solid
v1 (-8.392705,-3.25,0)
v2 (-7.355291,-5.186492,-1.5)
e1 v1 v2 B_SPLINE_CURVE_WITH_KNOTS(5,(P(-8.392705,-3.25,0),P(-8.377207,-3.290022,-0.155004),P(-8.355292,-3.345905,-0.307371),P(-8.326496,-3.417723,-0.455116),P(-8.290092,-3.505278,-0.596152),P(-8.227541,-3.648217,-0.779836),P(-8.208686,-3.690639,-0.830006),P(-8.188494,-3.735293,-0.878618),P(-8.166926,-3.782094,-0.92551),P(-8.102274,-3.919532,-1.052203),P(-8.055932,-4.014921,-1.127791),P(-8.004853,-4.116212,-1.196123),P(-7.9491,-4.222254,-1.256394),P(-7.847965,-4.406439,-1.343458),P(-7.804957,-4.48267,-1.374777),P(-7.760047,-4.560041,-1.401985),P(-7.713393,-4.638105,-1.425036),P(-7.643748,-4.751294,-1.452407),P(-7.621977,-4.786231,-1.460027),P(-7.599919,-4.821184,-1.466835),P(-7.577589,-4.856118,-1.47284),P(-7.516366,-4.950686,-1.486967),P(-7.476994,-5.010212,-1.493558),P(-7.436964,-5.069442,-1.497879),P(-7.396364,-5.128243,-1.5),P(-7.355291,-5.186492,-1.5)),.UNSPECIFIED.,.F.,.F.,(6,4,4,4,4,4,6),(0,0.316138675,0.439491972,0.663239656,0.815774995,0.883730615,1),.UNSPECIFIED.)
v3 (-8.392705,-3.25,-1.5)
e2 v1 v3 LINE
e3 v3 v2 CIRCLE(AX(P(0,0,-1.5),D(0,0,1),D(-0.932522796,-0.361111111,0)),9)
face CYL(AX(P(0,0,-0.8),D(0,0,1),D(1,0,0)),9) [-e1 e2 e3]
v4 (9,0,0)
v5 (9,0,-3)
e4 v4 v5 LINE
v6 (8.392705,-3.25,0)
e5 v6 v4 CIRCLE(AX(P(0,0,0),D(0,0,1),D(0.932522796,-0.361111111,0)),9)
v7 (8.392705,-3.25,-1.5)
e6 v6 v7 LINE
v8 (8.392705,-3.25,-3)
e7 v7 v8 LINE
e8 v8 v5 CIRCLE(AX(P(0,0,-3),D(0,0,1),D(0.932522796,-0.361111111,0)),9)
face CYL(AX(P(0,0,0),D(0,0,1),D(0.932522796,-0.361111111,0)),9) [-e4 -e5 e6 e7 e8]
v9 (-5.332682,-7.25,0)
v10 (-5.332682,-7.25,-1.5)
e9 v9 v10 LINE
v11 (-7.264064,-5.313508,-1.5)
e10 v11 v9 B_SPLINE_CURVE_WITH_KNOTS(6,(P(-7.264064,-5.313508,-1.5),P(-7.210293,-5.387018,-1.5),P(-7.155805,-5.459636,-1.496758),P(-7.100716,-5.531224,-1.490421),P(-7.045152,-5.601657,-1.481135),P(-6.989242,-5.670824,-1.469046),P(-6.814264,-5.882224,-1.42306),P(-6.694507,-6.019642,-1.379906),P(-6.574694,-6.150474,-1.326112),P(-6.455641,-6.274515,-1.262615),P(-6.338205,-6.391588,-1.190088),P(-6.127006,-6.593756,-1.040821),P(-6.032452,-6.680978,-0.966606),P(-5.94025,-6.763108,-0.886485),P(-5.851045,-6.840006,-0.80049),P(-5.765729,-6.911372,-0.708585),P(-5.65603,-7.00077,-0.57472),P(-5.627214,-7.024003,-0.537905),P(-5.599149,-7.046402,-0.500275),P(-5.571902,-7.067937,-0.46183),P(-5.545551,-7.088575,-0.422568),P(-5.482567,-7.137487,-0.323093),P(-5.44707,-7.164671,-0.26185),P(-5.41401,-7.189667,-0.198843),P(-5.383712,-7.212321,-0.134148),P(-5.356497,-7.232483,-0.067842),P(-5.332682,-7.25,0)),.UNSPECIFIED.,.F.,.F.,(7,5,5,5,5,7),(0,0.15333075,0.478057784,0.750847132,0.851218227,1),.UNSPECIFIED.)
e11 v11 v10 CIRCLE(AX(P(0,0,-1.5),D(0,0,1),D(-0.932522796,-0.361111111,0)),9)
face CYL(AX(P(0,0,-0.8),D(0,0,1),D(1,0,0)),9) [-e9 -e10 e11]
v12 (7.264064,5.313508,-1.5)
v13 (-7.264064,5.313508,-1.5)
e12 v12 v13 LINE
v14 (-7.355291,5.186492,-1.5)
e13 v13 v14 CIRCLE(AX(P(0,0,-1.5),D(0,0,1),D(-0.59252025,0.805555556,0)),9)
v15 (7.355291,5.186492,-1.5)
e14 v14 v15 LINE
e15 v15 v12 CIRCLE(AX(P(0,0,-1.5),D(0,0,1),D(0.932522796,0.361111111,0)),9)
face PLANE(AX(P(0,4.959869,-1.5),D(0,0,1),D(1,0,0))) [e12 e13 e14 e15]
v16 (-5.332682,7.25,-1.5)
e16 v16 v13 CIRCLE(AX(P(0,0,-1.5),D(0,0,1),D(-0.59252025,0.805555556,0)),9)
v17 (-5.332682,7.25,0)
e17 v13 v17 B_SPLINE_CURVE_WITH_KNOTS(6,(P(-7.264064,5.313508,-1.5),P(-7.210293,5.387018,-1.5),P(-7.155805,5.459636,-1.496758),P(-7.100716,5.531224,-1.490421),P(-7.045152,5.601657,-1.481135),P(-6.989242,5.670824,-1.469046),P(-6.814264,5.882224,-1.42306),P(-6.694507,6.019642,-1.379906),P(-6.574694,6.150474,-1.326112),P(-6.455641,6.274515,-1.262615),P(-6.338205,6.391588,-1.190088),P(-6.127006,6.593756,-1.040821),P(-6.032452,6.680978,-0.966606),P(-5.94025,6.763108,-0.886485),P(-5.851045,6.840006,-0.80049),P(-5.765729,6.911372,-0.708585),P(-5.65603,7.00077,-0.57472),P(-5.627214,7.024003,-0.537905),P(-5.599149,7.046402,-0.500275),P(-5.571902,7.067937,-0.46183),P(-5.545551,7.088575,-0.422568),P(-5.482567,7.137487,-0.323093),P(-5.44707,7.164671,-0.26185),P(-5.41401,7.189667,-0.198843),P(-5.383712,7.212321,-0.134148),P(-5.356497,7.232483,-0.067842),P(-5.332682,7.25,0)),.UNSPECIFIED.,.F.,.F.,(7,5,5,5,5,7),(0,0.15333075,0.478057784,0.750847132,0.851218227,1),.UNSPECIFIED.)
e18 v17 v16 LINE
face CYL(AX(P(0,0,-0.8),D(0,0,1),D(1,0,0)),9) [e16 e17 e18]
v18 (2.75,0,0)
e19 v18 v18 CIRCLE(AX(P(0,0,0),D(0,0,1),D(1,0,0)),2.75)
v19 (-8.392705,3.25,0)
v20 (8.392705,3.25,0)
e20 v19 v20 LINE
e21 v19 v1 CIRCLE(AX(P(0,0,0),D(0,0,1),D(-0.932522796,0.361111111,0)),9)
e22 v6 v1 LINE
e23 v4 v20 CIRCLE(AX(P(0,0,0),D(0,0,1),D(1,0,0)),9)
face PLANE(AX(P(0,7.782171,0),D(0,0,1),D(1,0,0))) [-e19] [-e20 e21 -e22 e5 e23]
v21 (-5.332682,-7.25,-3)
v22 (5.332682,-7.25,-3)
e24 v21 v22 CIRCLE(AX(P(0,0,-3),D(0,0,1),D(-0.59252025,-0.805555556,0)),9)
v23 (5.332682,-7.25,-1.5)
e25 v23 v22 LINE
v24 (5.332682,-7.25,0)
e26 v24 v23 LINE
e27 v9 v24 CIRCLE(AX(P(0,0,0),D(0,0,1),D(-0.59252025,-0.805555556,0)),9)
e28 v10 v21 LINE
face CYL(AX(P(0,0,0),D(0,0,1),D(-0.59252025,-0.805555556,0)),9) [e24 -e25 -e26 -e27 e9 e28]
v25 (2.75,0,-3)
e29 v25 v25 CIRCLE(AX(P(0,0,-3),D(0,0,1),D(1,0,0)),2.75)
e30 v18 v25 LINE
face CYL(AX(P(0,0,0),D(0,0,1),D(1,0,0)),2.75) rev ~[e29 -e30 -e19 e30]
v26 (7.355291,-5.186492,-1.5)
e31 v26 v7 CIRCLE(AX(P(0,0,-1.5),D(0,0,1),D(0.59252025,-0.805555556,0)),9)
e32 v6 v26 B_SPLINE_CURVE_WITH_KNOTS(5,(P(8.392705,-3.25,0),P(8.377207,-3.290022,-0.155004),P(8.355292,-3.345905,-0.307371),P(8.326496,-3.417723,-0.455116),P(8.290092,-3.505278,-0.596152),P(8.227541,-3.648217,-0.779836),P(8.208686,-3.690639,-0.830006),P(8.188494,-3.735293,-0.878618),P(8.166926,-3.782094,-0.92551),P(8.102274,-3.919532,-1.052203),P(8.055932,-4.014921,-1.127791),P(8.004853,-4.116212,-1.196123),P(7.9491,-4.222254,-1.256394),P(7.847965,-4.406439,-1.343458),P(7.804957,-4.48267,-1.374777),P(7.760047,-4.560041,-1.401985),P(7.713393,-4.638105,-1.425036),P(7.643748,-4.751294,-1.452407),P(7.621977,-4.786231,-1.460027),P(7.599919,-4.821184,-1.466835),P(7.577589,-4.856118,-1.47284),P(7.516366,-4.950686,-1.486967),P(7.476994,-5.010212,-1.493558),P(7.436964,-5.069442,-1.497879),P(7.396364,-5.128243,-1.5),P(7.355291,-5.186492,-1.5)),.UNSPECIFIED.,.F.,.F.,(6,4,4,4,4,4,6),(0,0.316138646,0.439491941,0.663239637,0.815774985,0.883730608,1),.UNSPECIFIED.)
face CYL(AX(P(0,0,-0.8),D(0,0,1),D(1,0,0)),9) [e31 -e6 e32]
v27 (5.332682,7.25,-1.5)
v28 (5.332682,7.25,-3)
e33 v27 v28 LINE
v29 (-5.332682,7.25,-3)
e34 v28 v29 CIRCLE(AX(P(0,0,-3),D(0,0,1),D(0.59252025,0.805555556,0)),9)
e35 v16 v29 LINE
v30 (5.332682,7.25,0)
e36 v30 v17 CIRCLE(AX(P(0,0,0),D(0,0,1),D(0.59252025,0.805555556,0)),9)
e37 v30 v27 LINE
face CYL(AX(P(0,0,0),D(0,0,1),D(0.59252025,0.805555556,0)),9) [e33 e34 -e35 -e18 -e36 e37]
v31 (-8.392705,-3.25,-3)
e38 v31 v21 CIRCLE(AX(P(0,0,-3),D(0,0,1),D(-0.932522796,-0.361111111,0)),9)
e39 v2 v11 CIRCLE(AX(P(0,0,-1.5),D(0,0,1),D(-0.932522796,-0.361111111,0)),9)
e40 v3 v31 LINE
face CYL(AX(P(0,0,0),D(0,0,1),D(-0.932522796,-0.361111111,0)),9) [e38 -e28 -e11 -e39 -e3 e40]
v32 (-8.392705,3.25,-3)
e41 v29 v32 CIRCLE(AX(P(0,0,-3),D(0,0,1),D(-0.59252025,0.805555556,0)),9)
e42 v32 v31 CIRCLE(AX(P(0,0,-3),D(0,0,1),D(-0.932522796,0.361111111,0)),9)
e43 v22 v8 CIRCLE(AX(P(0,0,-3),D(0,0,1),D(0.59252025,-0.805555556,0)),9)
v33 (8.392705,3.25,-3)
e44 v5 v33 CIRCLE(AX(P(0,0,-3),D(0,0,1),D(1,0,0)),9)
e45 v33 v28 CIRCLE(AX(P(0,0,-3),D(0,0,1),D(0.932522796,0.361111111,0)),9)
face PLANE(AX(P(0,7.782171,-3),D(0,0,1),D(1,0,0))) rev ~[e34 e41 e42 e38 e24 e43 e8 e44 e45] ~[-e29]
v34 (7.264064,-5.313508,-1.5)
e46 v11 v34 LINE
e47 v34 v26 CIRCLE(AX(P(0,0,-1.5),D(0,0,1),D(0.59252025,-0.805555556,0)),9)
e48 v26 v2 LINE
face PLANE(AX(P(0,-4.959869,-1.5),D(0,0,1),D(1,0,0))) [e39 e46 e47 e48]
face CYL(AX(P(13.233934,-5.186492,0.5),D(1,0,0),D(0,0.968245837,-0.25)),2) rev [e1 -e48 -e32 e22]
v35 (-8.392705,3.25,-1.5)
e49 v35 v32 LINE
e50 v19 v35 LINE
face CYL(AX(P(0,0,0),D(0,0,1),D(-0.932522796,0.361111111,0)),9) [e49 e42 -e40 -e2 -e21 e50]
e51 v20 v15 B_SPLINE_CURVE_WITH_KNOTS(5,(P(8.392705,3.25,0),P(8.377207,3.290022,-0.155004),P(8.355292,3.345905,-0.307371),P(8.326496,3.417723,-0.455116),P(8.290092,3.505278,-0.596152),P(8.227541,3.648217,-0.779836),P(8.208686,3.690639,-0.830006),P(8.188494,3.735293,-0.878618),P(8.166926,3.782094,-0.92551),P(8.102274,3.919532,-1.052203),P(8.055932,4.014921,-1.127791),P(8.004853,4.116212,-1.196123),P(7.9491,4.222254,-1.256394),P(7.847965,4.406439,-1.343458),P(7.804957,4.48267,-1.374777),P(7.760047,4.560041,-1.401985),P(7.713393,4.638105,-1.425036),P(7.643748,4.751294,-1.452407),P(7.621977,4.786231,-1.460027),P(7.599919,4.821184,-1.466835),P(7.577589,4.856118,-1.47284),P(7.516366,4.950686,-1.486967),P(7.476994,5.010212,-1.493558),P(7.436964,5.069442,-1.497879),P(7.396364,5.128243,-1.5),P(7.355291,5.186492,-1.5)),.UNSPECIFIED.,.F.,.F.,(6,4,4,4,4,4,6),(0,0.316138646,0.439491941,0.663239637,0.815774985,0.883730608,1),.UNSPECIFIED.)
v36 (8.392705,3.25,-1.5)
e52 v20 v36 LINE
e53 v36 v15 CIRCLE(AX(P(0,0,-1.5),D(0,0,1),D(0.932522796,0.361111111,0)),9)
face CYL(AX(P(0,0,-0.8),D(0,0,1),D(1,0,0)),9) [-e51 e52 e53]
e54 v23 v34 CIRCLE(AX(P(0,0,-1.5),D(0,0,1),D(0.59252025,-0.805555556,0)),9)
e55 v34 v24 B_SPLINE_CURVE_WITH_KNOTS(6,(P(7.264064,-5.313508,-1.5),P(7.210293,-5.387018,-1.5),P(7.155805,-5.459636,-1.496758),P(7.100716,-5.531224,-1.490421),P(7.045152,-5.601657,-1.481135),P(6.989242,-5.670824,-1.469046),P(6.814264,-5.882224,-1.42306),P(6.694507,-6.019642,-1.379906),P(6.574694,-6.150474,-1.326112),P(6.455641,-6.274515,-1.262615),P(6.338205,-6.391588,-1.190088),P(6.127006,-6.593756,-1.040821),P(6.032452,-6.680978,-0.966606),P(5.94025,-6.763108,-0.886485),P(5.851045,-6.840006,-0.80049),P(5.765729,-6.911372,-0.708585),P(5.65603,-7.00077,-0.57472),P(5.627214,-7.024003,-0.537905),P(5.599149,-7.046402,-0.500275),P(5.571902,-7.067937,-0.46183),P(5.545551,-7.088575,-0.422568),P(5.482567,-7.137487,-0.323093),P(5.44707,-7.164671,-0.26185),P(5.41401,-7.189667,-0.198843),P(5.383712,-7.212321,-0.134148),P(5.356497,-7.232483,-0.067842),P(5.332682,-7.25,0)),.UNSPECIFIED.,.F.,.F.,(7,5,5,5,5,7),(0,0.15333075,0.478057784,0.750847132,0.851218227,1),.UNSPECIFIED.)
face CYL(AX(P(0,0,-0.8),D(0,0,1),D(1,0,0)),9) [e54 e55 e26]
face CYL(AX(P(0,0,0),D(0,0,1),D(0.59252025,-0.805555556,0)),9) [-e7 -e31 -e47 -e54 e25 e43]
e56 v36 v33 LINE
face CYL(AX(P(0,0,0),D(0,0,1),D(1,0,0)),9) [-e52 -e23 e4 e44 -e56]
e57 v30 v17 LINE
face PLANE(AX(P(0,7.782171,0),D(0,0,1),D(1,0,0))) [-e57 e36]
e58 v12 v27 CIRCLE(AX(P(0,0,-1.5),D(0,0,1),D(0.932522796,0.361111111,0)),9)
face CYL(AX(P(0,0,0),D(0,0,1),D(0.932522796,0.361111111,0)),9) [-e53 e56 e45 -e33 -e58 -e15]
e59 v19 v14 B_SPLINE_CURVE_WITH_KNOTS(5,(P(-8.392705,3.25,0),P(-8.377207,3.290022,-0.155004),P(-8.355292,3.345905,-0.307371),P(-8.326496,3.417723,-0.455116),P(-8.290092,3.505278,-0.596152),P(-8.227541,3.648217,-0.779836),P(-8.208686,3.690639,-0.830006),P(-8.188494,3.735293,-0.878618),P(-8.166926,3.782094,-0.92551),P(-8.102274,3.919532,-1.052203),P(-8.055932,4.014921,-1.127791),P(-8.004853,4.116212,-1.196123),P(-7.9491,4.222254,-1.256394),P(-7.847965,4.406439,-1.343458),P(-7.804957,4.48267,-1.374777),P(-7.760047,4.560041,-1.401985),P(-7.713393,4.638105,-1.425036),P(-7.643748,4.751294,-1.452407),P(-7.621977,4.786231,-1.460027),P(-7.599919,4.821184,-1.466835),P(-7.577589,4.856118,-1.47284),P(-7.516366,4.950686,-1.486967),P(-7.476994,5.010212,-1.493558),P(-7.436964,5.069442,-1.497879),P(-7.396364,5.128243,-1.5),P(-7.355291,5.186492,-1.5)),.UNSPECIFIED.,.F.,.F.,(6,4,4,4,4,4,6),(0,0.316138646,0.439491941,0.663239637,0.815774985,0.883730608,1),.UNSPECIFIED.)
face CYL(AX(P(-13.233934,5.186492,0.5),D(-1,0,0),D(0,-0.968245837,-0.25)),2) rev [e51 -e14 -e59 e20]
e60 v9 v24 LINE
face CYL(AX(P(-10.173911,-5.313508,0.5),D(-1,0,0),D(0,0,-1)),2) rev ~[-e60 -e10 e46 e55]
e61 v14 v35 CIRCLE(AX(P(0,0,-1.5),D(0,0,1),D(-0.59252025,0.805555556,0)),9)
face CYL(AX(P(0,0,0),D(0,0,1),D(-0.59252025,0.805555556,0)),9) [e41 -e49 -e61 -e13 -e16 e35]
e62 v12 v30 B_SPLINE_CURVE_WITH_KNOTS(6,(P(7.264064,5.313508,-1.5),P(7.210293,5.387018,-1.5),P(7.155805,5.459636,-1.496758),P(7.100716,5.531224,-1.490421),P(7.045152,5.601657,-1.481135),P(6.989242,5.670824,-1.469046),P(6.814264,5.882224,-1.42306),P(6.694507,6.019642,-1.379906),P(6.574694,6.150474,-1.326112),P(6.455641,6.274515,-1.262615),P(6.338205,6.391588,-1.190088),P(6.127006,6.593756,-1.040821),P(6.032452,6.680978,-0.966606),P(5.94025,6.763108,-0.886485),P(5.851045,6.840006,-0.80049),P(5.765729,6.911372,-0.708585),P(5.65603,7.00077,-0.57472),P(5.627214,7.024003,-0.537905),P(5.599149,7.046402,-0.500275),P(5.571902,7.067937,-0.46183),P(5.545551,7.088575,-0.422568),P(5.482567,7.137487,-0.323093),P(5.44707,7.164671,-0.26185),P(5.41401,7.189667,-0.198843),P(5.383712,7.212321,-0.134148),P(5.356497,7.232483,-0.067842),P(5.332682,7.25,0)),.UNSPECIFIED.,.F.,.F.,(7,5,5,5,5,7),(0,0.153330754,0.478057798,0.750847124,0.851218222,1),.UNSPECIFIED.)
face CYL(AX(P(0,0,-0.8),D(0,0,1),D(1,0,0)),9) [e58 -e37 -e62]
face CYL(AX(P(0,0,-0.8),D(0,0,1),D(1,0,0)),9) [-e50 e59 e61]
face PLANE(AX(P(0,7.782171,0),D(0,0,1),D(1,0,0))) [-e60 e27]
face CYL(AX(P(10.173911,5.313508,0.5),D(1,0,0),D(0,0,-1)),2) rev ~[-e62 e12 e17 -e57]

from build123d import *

# Parameters (mm, degrees)
F0_R         = 2.75
F1_DEPTH     = 3
F2_DEPTH     = 1.5
F3_T4_DEPTH  = 26.4678686971
F3_S5_R      = 9
F3_T6_DEPTH  = 15
F3_T10_DEPTH = 20.3478228694
F3_S11_R     = 9
F3_T12_DEPTH = 12
F3_T16_DEPTH = 26.4678686971
F3_S17_R     = 9
F3_T18_DEPTH = 15
F3_T22_DEPTH = 20.3478228694
F3_S23_R     = 9
F3_T24_DEPTH = 12


# Not quite as in the source:
# - a fillet or chamfer that OpenCascade refuses, or shapes differently, is made with other operations: its cross-section is extruded or revolved along the edge and cut away or added


with BuildPart() as f1:
    # F0 (on Top) → F1 (new body)
    with BuildSketch(Plane.XY):
        with BuildLine():
            Line((-5.3326822519, 7.25), (5.3326822519, 7.25))
            ThreePointArc((5.3326822519, 7.25), (0, 9), (-5.3326822519, 7.25))
        make_face()
        with BuildLine():
            Line((-8.3927051658, 3.25), (8.3927051658, 3.25))
            ThreePointArc((8.3927051658, 3.25), (7.1481861295, 5.4684033372), (5.3326822519, 7.25))
            Line((5.3326822519, 7.25), (-5.3326822519, 7.25))
            ThreePointArc((-5.3326822519, 7.25), (-7.1481861295, 5.4684033372), (-8.3927051658, 3.25))
        make_face()
        with BuildLine():
            ThreePointArc((5.3326822519, -7.25), (7.1481861295, -5.4684033372), (8.3927051658, -3.25))
            Line((8.3927051658, -3.25), (-8.3927051658, -3.25))
            ThreePointArc((-8.3927051658, -3.25), (-7.1481861295, -5.4684033372), (-5.3326822519, -7.25))
            Line((-5.3326822519, -7.25), (5.3326822519, -7.25))
        make_face()
        with BuildLine():
            ThreePointArc((-5.3326822519, -7.25), (0, -9), (5.3326822519, -7.25))
            Line((5.3326822519, -7.25), (-5.3326822519, -7.25))
        make_face()
        with BuildLine():
            ThreePointArc((8.3927051658, -3.25), (8.8468736425, -1.6531263575), (9, 0))
            ThreePointArc((9, 0), (8.8468736425, 1.6531263575), (8.3927051658, 3.25))
            Line((8.3927051658, 3.25), (-8.3927051658, 3.25))
            ThreePointArc((-8.3927051658, 3.25), (-9, 0), (-8.3927051658, -3.25))
            Line((-8.3927051658, -3.25), (8.3927051658, -3.25))
        make_face()
        Circle(F0_R, mode=Mode.SUBTRACT)
    extrude(amount=-F1_DEPTH)

    # F0 (on Top) → F2 (cut)
    with BuildSketch(Plane.XY):
        with BuildLine():
            Line((-8.3927051658, 3.25), (8.3927051658, 3.25))
            ThreePointArc((8.3927051658, 3.25), (7.1481861295, 5.4684033372), (5.3326822519, 7.25))
            Line((5.3326822519, 7.25), (-5.3326822519, 7.25))
            ThreePointArc((-5.3326822519, 7.25), (-7.1481861295, 5.4684033372), (-8.3927051658, 3.25))
        make_face()
        with BuildLine():
            ThreePointArc((5.3326822519, -7.25), (7.1481861295, -5.4684033372), (8.3927051658, -3.25))
            Line((8.3927051658, -3.25), (-8.3927051658, -3.25))
            ThreePointArc((-8.3927051658, -3.25), (-7.1481861295, -5.4684033372), (-5.3326822519, -7.25))
            Line((-5.3326822519, -7.25), (5.3326822519, -7.25))
        make_face()
    extrude(amount=-F2_DEPTH, mode=Mode.SUBTRACT)

    # F3: fillet of radius 2 on 4 edges, made by hand


with BuildPart() as f3_tool2:
    # F3_s3 → F3_t4 (new body)
    with BuildSketch(Plane.YZ.offset(-13.2339343486)):
        with BuildLine():
            ThreePointArc((3.25, 0), (3.9617468017, -1.0811388301), (5.1864916731, -1.5))
            Line((5.1864916731, -1.5), (3.25, -1.5))
            Line((3.25, -1.5), (3.25, 0))
        make_face()
    extrude(amount=F3_T4_DEPTH)

    # F3_s5 → F3_t6 (intersect, symmetric)
    with BuildSketch(Plane.XY.offset(-0.8)):
        Circle(F3_S5_R)
    extrude(amount=F3_T6_DEPTH, both=True, mode=Mode.INTERSECT)


with BuildPart() as f1_1:
    add(f1.part)

    # F3_t1: union F3_tool2
    add(f3_tool2.part)


with BuildPart() as f3_tool8:
    # F3_s9 → F3_t10 (new body)
    with BuildSketch(Plane.YZ.offset(10.1739114347)):
        with BuildLine():
            ThreePointArc((5.3135083269, -1.5), (6.5382531983, -1.0811388301), (7.25, 0))
            Line((7.25, 0), (7.25, -1.5))
            Line((7.25, -1.5), (5.3135083269, -1.5))
        make_face()
    extrude(amount=-F3_T10_DEPTH)

    # F3_s11 → F3_t12 (intersect, symmetric)
    with BuildSketch(Plane.XY.offset(-0.8)):
        Circle(F3_S11_R)
    extrude(amount=F3_T12_DEPTH, both=True, mode=Mode.INTERSECT)


with BuildPart() as f1_2:
    add(f1_1.part)

    # F3_t7: union F3_tool8
    add(f3_tool8.part)


with BuildPart() as f3_tool14:
    # F3_s15 → F3_t16 (new body)
    with BuildSketch(Plane.YZ.offset(13.2339343486)):
        with BuildLine():
            ThreePointArc((-3.25, 0), (-3.9617468017, -1.0811388301), (-5.1864916731, -1.5))
            Line((-5.1864916731, -1.5), (-3.25, -1.5))
            Line((-3.25, -1.5), (-3.25, 0))
        make_face()
    extrude(amount=-F3_T16_DEPTH)

    # F3_s17 → F3_t18 (intersect, symmetric)
    with BuildSketch(Plane.XY.offset(-0.8)):
        Circle(F3_S17_R)
    extrude(amount=F3_T18_DEPTH, both=True, mode=Mode.INTERSECT)


with BuildPart() as f1_3:
    add(f1_2.part)

    # F3_t13: union F3_tool14
    add(f3_tool14.part)


with BuildPart() as f3_tool20:
    # F3_s21 → F3_t22 (new body)
    with BuildSketch(Plane.YZ.offset(-10.1739114347)):
        with BuildLine():
            ThreePointArc((-5.3135083269, -1.5), (-6.5382531983, -1.0811388301), (-7.25, 0))
            Line((-7.25, 0), (-7.25, -1.5))
            Line((-7.25, -1.5), (-5.3135083269, -1.5))
        make_face()
    extrude(amount=F3_T22_DEPTH)

    # F3_s23 → F3_t24 (intersect, symmetric)
    with BuildSketch(Plane.XY.offset(-0.8)):
        Circle(F3_S23_R)
    extrude(amount=F3_T24_DEPTH, both=True, mode=Mode.INTERSECT)


with BuildPart() as f1_4:
    add(f1_3.part)

    # F3_t19: union F3_tool20
    add(f3_tool20.part)


solid = f1_4.part
